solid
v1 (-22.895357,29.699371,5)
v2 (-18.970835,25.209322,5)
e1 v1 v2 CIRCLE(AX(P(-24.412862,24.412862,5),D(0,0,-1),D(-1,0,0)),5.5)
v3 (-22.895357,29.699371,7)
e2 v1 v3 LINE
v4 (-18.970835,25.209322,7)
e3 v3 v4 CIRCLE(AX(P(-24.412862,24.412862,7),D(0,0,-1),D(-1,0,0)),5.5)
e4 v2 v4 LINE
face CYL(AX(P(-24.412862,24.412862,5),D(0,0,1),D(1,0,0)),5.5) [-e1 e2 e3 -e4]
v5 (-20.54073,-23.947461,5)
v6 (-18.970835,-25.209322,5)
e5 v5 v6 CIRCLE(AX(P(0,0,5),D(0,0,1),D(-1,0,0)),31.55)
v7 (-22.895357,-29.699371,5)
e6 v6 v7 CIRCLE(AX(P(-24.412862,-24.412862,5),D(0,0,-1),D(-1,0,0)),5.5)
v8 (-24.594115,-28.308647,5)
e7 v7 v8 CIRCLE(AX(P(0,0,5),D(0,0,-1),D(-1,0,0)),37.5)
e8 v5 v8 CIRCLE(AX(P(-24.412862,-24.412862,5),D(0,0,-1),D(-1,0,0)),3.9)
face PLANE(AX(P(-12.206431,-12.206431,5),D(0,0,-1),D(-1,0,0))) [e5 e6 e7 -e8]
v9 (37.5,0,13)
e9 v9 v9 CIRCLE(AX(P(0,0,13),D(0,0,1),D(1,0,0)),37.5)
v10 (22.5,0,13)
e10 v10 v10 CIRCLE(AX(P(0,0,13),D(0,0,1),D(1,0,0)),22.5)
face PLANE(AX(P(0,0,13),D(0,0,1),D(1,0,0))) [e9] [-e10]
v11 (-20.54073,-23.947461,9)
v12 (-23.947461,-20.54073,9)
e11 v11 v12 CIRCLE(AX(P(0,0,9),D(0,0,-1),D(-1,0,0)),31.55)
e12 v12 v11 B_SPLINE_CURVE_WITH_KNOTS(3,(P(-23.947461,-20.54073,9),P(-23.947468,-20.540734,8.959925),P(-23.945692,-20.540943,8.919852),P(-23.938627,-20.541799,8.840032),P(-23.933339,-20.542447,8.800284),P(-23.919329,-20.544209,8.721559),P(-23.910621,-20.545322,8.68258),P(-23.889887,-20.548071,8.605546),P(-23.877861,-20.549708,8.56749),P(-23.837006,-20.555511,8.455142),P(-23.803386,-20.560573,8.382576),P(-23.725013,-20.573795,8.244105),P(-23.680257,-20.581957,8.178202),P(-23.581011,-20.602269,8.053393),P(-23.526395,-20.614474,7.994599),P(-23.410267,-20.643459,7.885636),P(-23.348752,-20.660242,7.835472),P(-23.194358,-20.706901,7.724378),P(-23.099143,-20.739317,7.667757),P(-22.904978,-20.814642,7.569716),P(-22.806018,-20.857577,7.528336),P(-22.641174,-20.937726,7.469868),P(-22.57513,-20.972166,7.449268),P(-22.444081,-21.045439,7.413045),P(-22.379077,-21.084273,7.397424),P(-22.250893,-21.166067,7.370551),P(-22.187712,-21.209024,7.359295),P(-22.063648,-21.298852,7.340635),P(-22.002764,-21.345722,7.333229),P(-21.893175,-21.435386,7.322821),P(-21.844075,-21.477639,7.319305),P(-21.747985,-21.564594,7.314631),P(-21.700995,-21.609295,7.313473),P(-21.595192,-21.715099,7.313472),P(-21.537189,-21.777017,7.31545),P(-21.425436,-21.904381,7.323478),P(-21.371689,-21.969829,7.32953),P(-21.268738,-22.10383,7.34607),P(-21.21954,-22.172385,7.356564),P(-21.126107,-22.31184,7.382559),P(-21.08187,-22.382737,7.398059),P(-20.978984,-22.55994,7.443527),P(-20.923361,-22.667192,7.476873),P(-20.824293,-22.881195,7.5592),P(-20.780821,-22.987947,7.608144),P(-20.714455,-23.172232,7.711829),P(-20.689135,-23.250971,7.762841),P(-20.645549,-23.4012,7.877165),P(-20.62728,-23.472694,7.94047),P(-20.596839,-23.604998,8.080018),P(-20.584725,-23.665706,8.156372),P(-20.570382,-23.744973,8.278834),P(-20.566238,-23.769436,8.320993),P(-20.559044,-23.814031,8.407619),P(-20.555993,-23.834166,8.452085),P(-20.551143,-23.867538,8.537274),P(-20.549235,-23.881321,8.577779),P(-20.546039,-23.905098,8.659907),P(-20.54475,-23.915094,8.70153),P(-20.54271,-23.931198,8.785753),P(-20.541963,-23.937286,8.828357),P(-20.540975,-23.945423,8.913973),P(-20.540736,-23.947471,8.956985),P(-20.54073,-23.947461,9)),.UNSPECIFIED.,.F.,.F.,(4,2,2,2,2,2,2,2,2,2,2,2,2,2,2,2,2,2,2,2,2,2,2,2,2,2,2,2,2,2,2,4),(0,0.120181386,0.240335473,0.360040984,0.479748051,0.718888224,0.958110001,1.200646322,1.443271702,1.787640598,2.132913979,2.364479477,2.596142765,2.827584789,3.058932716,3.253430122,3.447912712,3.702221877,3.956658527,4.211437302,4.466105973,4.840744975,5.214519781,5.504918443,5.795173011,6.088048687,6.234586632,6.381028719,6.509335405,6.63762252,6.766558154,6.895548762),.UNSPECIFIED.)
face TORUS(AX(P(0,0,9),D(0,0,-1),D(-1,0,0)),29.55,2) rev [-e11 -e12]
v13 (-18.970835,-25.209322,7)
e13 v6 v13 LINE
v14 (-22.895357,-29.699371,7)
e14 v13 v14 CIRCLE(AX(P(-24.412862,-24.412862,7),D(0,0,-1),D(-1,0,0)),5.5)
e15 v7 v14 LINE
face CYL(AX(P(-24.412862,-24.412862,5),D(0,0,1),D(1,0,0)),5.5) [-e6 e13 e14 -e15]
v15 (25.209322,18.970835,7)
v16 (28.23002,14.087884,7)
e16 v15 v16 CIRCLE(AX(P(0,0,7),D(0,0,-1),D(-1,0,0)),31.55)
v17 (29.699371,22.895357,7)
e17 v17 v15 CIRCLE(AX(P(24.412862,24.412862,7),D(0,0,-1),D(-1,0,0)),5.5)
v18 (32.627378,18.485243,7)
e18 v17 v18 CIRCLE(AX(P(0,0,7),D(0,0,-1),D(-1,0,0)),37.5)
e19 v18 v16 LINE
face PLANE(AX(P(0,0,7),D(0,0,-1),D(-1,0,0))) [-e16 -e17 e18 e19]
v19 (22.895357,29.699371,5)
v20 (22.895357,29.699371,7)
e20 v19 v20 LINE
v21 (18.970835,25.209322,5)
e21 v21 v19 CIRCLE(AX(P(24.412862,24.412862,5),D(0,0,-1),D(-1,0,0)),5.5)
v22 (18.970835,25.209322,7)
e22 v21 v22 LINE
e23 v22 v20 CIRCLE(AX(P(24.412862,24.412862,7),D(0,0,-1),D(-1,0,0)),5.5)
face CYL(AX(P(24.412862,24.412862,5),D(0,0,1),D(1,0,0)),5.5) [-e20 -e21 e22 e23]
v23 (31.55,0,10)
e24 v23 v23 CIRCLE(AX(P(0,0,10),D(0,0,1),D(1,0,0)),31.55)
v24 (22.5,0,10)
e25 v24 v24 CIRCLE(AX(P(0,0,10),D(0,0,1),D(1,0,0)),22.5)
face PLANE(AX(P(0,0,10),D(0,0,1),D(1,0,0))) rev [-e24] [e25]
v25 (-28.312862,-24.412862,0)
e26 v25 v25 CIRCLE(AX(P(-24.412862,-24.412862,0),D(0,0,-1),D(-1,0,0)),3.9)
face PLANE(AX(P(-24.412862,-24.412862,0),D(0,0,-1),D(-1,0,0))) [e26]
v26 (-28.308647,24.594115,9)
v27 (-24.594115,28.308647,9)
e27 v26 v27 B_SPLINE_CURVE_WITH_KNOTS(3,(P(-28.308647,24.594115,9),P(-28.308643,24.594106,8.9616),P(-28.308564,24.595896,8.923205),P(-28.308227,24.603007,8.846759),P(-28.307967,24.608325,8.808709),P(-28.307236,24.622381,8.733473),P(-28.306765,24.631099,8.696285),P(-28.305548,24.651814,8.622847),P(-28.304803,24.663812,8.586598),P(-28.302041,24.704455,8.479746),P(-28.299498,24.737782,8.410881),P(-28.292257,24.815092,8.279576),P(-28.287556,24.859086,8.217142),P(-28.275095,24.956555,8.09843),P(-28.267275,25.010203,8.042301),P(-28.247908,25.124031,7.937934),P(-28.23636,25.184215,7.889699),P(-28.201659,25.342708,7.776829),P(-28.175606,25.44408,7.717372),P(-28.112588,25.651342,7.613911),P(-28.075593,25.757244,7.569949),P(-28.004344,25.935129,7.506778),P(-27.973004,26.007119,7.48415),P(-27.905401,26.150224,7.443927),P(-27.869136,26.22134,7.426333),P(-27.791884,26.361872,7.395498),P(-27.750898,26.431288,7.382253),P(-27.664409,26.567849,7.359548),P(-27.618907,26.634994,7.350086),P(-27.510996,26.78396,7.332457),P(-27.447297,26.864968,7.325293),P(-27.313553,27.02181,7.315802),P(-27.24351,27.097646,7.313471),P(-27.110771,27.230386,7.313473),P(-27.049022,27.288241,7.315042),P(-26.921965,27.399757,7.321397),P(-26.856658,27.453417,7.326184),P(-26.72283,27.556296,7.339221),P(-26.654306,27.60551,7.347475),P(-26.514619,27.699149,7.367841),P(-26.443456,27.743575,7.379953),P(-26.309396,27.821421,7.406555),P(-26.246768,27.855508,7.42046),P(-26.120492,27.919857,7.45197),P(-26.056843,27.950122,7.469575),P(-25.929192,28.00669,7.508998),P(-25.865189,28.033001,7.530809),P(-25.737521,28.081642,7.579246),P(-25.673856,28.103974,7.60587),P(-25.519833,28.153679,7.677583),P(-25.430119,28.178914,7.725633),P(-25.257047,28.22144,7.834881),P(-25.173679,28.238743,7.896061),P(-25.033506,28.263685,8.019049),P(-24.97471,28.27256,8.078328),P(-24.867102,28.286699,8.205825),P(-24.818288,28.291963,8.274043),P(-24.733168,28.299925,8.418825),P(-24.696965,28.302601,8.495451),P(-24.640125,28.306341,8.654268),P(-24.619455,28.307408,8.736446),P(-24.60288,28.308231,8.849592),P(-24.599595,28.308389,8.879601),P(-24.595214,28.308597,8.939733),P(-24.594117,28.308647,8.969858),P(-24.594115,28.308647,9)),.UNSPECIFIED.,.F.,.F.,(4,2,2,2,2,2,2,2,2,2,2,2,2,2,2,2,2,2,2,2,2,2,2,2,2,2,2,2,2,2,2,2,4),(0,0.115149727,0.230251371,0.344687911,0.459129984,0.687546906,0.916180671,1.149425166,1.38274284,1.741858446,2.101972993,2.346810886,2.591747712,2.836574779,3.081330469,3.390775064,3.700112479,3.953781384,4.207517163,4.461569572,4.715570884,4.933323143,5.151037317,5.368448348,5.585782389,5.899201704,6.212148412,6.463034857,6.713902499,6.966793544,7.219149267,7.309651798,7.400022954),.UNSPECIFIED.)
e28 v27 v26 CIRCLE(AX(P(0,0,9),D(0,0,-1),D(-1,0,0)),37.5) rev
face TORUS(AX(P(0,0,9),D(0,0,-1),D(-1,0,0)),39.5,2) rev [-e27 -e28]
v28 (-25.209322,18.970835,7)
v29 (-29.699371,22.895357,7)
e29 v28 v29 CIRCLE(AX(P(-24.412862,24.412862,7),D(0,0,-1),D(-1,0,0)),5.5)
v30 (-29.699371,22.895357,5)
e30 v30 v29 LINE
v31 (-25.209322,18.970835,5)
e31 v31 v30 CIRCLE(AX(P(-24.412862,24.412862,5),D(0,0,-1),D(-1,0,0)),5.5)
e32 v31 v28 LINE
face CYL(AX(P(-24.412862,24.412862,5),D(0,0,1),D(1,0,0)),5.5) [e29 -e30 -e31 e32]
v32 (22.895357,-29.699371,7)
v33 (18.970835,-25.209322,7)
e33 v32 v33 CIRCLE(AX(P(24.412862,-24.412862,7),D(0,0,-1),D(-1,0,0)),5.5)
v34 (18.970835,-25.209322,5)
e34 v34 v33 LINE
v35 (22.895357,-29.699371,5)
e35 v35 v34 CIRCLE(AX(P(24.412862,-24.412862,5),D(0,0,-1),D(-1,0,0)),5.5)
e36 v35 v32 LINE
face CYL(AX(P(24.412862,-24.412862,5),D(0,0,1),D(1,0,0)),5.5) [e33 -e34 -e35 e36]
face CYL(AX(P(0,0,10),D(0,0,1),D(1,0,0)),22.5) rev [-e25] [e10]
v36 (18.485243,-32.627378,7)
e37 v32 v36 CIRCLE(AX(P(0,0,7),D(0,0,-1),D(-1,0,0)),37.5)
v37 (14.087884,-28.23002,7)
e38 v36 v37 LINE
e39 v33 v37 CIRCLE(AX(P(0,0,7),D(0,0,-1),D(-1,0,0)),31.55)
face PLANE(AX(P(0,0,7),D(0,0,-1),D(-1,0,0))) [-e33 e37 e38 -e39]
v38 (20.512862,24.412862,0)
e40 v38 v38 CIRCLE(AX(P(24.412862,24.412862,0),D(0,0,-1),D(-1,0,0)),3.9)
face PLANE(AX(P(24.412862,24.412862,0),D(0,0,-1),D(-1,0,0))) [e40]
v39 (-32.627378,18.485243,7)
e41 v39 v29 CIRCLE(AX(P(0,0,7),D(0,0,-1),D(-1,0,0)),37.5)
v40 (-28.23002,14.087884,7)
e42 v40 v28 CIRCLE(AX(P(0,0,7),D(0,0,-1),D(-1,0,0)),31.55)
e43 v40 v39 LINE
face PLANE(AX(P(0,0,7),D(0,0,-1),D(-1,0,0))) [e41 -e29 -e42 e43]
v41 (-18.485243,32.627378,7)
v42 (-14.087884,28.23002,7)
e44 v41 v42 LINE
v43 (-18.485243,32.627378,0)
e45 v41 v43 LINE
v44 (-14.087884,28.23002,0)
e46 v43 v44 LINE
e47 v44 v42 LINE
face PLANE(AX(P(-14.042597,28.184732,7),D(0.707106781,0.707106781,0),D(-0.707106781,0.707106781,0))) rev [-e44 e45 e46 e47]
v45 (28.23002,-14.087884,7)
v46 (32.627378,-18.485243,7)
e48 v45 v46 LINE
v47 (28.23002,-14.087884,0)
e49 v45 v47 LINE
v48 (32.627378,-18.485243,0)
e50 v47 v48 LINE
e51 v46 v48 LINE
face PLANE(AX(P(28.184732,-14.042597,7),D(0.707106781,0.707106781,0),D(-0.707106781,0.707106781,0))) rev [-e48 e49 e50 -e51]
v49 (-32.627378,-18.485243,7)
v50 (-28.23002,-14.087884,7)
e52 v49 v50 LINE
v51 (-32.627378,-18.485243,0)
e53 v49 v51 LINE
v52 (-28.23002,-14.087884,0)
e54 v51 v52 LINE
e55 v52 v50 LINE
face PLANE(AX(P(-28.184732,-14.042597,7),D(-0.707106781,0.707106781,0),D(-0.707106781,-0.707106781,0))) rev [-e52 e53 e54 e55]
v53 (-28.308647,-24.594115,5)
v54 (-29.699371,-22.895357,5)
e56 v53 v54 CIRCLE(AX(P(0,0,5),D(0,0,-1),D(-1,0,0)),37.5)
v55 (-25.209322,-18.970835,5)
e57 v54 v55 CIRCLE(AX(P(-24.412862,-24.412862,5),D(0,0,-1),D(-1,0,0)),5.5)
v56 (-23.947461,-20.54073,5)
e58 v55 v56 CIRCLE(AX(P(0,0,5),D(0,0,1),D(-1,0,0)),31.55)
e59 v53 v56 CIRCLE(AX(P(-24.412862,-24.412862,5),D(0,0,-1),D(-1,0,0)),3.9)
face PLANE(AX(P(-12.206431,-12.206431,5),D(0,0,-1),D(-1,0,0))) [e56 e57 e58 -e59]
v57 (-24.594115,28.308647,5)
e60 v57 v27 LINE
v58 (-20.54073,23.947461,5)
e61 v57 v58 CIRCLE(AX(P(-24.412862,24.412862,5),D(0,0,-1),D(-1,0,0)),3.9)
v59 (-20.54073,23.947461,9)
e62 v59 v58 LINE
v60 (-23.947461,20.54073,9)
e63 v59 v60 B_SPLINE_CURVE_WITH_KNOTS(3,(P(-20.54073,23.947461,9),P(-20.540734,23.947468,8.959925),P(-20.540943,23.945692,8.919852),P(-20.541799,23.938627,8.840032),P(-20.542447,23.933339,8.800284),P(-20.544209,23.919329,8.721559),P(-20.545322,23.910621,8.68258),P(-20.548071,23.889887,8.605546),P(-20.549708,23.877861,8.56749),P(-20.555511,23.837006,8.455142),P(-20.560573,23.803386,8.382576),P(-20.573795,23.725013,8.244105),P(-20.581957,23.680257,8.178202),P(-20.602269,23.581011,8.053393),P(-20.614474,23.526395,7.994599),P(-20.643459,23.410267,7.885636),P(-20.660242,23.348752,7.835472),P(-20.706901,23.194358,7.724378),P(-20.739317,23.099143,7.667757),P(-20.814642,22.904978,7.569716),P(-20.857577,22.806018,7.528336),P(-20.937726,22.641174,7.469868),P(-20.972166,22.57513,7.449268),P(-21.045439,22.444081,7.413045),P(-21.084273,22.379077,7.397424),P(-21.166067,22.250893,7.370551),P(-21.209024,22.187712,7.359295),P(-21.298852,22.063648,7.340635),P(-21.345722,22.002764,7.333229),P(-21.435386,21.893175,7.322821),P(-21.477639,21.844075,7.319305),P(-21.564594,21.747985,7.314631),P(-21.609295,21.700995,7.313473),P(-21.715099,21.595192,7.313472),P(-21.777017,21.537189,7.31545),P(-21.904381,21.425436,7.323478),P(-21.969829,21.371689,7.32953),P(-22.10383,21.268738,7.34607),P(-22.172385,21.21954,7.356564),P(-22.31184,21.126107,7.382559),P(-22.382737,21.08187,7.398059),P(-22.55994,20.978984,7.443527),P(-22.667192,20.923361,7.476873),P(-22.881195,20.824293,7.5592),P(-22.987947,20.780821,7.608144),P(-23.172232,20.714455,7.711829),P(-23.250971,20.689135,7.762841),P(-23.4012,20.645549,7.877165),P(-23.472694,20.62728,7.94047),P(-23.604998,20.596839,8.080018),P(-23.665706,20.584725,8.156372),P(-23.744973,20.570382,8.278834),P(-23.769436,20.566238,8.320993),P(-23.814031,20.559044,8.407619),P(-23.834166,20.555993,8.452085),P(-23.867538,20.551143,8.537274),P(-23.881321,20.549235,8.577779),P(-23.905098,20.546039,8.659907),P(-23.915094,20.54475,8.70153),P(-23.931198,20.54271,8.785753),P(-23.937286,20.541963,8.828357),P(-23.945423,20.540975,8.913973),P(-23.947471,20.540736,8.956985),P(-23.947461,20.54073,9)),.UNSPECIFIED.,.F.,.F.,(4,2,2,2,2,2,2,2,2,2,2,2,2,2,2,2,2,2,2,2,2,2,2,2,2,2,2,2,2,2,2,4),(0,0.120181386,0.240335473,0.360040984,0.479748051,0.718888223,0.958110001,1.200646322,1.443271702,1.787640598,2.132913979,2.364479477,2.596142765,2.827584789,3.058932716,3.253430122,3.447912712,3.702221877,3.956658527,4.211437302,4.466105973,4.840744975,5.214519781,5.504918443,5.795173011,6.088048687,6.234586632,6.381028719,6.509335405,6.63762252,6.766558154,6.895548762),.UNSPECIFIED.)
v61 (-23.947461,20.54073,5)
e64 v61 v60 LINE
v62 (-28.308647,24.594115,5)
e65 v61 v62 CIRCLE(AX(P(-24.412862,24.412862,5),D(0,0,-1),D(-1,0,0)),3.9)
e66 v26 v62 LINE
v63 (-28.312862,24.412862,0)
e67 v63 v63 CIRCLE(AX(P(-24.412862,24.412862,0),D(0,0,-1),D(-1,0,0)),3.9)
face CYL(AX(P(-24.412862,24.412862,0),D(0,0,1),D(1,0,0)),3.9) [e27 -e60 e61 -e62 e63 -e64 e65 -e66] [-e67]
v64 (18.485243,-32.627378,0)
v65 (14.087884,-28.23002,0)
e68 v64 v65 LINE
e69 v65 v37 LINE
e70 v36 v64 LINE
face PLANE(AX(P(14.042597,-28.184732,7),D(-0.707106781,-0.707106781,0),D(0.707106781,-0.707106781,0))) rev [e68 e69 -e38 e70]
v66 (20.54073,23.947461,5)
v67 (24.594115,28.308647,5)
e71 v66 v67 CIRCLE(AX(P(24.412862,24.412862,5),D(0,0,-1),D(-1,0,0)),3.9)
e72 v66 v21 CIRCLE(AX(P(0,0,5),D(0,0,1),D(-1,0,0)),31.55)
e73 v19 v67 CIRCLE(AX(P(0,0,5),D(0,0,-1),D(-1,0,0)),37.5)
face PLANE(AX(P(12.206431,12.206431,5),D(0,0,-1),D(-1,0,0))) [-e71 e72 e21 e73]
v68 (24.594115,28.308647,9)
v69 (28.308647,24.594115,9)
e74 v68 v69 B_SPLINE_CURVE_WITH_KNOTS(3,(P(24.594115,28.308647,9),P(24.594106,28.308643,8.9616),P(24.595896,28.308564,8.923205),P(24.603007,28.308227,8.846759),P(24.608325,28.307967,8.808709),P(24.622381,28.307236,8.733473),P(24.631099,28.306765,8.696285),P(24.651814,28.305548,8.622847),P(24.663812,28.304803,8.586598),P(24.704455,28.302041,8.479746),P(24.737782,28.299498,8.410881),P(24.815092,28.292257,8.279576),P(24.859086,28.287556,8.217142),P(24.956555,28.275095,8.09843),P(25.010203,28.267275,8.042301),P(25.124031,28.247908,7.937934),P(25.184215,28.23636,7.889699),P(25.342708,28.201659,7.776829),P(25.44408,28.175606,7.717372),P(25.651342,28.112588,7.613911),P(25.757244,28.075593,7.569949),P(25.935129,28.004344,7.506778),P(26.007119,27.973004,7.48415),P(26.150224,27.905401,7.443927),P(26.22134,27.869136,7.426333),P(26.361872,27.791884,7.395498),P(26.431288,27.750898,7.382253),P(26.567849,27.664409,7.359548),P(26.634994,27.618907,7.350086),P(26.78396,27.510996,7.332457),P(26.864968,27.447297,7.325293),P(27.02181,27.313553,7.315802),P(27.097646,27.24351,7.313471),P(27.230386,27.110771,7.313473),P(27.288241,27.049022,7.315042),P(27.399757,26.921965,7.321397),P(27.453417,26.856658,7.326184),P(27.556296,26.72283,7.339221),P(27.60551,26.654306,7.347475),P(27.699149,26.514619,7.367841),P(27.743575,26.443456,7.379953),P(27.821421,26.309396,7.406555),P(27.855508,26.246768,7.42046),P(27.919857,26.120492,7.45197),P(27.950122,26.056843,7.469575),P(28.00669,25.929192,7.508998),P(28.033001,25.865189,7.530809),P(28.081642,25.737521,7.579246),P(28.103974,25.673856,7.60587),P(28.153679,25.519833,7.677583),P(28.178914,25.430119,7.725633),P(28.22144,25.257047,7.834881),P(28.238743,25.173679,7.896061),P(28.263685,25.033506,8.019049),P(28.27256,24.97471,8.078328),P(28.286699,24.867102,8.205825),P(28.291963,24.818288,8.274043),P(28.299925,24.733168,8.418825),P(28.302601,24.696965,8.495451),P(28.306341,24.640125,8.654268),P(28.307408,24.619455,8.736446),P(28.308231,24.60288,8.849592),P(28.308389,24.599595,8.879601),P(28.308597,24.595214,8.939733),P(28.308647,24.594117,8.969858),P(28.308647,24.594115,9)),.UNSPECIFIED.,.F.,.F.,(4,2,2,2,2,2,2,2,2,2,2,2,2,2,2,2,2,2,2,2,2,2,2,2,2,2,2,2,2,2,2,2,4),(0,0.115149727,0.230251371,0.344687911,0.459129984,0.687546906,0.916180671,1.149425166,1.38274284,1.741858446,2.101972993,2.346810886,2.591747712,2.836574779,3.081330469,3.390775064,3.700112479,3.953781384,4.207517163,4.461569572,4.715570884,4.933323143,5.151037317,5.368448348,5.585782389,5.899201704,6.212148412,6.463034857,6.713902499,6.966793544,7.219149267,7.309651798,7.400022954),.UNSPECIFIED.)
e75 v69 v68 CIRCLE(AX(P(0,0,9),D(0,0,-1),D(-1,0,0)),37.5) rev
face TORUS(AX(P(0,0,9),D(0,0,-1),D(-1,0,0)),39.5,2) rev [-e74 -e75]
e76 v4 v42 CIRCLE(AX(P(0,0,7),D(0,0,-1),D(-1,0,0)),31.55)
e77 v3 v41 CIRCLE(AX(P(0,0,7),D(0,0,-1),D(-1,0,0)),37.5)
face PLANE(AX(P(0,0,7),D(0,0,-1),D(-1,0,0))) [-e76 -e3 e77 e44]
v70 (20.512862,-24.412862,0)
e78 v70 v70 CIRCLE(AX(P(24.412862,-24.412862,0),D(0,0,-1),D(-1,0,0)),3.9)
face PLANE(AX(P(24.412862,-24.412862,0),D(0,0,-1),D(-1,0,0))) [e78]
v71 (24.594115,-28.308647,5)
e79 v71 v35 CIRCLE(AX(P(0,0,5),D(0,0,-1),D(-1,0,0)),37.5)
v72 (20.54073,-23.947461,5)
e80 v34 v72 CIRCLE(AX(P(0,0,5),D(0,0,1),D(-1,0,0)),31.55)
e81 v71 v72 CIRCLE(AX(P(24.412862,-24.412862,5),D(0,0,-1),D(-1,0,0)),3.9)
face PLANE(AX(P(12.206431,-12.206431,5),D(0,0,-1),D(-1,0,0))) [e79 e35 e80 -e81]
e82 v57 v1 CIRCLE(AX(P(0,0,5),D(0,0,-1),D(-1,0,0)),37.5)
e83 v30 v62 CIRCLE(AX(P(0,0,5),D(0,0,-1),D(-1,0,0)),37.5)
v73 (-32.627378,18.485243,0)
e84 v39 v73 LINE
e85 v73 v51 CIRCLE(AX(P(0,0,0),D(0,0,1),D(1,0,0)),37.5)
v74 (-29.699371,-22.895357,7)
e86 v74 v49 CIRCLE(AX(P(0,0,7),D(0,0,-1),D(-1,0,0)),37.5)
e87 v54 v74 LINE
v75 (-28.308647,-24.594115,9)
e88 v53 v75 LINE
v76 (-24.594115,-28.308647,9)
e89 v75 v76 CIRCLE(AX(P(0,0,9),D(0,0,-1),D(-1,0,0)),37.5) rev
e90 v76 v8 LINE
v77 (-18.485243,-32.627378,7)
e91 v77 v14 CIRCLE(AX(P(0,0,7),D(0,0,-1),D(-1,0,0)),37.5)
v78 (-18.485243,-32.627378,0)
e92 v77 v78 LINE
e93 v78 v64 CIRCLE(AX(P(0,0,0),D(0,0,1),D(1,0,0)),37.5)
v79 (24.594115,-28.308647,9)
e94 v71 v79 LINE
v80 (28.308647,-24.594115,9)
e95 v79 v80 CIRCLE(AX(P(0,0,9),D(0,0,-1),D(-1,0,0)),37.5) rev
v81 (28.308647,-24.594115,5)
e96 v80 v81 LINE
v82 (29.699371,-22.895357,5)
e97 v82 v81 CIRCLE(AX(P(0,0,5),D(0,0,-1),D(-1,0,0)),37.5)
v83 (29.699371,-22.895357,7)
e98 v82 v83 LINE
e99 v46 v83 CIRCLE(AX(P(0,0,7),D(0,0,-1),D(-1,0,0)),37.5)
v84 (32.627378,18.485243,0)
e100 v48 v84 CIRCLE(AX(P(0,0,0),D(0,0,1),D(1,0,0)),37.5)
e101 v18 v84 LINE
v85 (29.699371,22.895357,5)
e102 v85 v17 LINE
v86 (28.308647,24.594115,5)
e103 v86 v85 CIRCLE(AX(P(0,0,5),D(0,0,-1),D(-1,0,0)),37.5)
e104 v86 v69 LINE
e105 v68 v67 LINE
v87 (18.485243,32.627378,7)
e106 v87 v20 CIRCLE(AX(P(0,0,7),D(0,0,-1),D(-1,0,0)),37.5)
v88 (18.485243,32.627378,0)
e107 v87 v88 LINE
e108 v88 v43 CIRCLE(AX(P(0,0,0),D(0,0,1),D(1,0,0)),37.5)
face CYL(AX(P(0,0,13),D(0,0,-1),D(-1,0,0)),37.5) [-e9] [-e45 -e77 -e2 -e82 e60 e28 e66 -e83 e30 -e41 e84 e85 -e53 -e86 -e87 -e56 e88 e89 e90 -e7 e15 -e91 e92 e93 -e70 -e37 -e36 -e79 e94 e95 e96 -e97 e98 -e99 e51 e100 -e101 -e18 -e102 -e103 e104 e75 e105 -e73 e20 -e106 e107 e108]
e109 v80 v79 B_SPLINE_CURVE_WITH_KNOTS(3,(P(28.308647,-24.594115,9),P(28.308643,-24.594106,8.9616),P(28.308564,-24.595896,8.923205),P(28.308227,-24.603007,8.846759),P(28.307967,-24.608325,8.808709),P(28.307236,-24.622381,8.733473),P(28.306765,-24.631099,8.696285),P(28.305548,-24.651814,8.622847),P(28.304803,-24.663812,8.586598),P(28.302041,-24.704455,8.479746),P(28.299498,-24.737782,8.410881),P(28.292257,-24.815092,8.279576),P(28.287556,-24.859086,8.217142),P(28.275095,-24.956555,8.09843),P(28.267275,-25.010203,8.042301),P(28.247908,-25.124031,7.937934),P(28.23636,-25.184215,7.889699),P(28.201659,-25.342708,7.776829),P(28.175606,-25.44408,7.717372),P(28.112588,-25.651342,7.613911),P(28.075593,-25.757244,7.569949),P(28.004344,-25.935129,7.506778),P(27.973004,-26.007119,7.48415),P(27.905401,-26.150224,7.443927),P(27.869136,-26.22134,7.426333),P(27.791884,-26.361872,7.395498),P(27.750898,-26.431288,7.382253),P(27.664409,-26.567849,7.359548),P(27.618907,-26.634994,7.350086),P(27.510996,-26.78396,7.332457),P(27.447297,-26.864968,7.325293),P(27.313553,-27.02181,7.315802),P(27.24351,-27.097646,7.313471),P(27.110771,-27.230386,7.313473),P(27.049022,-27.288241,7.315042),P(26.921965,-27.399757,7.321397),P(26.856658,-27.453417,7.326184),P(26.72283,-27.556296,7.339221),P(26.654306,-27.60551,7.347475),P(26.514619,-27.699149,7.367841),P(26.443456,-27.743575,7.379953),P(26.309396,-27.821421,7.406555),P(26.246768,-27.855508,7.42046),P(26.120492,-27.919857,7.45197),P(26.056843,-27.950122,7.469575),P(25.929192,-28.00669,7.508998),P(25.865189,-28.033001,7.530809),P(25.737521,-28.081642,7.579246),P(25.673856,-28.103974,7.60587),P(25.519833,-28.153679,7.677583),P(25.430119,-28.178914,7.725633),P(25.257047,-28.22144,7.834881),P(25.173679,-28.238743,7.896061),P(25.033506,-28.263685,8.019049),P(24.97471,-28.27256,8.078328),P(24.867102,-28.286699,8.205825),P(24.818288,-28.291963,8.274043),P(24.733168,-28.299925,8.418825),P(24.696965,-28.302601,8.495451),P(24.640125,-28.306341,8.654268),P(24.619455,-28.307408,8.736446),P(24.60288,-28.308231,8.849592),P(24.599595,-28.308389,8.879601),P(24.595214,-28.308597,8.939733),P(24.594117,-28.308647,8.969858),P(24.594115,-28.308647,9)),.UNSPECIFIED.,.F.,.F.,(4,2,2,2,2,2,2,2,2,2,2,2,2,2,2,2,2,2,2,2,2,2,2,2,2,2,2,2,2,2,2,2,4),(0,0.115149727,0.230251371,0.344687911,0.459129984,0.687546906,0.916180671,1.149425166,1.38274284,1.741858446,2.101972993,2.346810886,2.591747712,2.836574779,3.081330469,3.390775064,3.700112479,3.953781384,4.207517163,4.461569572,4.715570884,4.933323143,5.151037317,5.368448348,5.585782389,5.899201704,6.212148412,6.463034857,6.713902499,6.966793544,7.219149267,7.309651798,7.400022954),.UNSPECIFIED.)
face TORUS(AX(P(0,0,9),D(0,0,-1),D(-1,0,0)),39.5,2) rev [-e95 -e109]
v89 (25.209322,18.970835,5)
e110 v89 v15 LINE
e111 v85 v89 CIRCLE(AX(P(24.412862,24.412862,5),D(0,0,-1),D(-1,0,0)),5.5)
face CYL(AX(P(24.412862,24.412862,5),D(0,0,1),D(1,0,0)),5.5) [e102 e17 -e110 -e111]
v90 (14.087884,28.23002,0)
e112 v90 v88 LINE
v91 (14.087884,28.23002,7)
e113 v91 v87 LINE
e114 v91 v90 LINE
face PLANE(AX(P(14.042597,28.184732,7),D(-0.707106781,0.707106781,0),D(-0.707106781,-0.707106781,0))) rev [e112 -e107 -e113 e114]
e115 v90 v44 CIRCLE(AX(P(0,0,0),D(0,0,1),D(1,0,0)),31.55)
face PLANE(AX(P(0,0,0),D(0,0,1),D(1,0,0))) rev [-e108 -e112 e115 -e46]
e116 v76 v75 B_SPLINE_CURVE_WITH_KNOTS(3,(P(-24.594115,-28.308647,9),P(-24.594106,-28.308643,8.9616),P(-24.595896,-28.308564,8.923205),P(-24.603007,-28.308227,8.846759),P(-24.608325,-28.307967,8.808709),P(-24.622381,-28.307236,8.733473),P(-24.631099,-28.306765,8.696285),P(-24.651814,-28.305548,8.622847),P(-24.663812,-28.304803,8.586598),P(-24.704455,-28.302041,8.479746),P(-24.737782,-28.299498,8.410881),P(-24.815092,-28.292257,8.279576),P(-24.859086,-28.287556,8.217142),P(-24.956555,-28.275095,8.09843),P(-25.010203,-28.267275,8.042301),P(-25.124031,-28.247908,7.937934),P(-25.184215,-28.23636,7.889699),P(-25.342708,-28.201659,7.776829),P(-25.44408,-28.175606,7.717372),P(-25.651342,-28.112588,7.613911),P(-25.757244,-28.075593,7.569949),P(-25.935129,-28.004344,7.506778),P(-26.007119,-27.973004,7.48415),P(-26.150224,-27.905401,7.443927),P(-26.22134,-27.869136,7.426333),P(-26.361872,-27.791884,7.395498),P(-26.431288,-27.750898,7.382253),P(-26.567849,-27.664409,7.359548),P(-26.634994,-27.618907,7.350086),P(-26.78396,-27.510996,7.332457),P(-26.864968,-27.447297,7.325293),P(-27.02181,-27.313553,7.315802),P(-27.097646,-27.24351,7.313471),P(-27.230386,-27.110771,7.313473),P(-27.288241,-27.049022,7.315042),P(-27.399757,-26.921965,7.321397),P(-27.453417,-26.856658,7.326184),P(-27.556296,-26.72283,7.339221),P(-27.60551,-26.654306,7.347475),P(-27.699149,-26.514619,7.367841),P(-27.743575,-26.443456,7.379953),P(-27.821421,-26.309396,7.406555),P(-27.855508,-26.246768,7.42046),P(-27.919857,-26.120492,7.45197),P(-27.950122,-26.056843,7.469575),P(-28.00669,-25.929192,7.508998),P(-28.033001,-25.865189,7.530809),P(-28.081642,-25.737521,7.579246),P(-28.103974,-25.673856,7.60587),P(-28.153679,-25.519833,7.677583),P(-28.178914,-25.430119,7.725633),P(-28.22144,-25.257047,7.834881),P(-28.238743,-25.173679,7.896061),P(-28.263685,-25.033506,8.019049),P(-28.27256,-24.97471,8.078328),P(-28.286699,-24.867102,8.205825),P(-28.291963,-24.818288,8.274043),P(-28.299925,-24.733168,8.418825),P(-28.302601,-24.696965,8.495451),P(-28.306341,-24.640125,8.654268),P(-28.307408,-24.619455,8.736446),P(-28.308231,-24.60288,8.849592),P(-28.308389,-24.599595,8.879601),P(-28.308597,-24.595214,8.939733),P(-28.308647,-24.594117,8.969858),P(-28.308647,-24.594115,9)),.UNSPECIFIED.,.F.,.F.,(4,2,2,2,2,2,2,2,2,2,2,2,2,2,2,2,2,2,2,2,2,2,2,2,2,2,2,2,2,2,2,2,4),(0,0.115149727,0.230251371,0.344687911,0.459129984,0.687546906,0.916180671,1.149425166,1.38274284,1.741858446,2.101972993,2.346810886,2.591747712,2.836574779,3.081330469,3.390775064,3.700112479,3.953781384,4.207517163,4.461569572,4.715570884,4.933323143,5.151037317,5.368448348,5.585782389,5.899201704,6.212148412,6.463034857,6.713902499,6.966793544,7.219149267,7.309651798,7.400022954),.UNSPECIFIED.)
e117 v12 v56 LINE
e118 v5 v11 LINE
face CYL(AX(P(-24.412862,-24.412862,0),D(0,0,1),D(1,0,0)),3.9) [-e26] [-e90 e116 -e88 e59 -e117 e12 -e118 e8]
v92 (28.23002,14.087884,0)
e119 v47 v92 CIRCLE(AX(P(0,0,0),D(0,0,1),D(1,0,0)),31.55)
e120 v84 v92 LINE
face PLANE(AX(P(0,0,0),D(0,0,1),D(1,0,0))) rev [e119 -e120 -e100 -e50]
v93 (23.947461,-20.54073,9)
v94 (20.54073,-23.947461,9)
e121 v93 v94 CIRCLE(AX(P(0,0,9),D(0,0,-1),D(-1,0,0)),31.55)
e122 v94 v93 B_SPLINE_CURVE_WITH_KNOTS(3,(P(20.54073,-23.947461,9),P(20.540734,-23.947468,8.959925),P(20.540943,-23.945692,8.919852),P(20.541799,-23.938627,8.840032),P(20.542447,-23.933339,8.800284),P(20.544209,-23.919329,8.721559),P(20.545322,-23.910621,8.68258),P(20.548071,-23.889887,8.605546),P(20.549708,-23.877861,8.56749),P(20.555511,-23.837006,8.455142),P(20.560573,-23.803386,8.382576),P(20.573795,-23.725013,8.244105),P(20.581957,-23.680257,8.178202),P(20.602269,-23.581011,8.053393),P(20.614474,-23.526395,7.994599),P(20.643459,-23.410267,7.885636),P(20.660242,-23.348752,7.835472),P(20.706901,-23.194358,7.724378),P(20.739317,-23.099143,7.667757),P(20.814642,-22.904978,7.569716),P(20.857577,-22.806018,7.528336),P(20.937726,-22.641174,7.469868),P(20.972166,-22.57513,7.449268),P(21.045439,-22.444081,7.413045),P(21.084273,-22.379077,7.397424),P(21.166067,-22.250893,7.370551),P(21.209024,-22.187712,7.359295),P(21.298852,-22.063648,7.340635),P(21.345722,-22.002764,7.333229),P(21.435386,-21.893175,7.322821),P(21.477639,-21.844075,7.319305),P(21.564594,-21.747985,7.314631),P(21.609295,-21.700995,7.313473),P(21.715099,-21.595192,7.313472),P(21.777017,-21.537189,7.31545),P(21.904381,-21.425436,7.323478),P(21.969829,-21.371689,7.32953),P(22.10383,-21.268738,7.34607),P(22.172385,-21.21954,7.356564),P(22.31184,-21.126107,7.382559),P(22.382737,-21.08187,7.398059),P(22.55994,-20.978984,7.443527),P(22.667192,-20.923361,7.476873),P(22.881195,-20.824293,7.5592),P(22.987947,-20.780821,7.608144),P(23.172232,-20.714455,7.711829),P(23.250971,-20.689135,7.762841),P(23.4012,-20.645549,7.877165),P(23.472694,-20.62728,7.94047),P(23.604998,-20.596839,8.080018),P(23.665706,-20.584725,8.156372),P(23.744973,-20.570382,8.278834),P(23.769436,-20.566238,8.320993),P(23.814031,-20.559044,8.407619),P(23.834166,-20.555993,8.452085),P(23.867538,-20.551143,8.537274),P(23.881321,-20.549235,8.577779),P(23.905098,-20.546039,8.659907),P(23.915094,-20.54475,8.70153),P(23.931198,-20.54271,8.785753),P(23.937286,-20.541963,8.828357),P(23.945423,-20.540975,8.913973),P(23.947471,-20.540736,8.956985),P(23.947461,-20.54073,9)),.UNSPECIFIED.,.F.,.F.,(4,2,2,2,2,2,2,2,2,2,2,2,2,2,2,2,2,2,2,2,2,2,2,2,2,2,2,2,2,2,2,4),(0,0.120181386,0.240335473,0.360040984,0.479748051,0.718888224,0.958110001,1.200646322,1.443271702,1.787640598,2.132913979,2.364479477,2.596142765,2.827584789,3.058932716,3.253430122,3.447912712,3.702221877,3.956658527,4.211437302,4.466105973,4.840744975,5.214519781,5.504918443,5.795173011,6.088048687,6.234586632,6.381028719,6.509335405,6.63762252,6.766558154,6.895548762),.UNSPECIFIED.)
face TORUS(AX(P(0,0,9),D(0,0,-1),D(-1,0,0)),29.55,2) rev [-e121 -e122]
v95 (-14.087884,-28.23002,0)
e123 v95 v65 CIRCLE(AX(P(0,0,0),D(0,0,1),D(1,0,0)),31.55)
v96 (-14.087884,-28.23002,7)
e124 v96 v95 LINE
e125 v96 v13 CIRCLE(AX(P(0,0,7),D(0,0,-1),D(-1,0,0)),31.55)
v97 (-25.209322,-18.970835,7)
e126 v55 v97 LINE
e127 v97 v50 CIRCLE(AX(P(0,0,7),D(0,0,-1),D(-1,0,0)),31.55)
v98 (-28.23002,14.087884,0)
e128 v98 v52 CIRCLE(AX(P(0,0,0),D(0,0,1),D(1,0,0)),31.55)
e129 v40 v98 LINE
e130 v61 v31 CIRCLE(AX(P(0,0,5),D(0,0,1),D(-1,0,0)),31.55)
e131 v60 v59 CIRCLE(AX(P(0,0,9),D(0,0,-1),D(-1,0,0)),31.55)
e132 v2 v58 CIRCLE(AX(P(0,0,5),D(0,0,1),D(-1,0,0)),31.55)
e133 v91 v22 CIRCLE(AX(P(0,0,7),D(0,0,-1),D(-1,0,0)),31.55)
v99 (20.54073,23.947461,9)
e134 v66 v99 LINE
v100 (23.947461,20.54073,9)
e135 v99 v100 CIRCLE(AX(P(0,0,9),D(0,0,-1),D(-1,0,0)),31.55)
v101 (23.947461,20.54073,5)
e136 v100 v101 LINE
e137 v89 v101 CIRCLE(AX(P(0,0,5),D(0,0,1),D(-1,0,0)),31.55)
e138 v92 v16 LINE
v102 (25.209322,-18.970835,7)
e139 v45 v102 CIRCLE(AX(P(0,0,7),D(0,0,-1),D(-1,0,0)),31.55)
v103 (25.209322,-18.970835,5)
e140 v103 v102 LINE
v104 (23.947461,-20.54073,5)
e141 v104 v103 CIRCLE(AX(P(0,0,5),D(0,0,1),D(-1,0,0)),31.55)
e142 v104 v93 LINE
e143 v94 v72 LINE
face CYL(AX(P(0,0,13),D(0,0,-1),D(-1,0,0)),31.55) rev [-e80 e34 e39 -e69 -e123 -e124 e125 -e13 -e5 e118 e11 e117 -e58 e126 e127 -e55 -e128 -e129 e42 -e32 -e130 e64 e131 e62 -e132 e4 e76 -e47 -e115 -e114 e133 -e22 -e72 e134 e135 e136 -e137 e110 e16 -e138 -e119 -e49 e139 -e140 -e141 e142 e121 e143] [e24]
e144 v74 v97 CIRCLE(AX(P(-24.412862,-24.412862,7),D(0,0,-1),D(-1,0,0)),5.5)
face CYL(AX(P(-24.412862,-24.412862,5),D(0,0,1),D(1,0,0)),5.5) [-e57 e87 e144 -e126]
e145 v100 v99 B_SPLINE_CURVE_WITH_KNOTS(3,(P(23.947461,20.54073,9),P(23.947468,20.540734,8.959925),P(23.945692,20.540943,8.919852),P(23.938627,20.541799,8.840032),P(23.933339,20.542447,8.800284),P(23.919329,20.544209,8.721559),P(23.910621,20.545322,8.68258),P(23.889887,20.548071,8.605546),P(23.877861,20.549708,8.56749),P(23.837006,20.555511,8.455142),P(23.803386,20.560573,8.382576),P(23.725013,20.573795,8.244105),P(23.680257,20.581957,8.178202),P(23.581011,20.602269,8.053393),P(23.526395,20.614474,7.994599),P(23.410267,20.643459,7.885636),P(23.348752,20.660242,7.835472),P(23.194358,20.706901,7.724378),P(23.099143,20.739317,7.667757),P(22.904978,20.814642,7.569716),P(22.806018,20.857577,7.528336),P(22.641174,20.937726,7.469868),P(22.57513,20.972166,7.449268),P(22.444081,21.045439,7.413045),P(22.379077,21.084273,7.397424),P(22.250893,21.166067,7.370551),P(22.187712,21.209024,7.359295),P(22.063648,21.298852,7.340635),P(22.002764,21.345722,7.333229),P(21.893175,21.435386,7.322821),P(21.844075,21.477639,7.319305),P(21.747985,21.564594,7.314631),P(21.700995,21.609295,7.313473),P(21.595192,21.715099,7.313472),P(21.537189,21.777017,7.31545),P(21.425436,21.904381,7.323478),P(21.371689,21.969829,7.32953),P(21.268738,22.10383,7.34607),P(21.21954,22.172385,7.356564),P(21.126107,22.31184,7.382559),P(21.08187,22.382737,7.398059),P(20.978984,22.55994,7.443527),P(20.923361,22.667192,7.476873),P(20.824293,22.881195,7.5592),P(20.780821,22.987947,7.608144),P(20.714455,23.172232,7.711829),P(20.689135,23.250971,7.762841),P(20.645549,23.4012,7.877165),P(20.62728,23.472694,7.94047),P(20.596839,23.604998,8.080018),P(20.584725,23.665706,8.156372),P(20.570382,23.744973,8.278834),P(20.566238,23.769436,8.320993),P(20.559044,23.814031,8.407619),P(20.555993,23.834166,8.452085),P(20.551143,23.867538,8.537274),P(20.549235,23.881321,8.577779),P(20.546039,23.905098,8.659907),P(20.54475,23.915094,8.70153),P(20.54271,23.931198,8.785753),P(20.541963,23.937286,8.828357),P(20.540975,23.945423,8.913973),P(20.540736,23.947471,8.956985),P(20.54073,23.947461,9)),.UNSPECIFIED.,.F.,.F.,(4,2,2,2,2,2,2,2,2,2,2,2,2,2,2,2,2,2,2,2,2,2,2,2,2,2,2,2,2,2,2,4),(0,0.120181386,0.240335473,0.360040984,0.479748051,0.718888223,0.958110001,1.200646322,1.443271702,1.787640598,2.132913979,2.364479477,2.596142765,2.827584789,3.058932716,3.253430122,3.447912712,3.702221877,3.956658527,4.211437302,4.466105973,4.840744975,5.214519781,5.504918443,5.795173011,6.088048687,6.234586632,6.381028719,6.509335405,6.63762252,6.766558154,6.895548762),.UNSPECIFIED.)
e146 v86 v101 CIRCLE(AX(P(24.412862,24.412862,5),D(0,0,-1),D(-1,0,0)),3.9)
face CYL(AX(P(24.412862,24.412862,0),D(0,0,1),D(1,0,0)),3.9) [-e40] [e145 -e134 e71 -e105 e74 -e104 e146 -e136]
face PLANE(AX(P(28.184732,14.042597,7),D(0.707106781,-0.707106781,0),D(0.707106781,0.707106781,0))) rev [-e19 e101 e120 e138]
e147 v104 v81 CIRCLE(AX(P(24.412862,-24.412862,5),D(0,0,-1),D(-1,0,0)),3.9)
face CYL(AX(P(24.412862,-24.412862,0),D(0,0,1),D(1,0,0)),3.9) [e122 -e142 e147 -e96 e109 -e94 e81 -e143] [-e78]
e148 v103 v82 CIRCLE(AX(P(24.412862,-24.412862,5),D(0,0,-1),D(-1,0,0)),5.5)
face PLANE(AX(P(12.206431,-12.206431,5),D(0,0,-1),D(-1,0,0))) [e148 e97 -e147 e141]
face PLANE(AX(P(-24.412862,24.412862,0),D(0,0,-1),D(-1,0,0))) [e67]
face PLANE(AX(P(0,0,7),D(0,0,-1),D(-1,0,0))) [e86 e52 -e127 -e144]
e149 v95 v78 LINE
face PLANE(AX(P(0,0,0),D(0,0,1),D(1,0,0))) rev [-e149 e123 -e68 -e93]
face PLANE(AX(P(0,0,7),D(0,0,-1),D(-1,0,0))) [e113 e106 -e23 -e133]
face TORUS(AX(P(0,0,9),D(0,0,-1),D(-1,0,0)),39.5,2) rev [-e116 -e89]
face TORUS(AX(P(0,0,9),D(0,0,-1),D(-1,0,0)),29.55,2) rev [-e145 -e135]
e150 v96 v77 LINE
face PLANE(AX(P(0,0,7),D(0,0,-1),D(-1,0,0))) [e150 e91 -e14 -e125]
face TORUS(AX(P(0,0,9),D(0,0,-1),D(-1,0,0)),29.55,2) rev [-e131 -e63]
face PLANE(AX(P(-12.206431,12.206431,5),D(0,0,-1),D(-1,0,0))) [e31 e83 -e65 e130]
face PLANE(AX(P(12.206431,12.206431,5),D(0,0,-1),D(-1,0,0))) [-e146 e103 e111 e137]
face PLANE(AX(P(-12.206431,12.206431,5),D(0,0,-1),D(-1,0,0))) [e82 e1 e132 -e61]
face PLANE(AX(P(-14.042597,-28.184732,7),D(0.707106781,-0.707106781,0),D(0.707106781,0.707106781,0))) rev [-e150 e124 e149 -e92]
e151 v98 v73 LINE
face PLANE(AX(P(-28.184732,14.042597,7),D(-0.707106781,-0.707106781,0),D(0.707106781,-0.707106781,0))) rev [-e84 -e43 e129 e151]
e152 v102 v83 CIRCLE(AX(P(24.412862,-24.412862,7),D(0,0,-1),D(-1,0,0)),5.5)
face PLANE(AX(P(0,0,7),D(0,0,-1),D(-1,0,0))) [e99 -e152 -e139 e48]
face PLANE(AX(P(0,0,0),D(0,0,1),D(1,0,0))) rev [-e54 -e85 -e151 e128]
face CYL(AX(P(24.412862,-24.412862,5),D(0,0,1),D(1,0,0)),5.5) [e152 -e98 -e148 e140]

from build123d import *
from build123d.topology import SkipClean

# Parameters (mm, degrees)
SKETCH1_R           = 37.5
SKETCH1_R_2         = 31.55
BOSS_EXTRUDE3_DEPTH = 13
BOSS_EXTRUDE4_START = -3
SKETCH3_R           = 31.55
SKETCH3_R_2         = 22.5
BOSS_EXTRUDE4_DEPTH = 3
CUT_EXTRUDE1_DEPTH  = 7
SKETCH5_R           = 3.9
BOSS_EXTRUDE5_DEPTH = 7
FILLET1_R           = 2
BOSS_EXTRUDE6_START = 2
BOSS_EXTRUDE6_DEPTH = 2


with BuildPart() as part:
    # Sketch1 → Boss-Extrude3 (new body)
    with BuildSketch(Plane.XY):
        with Locations(Location((0, 0, 0), (0, 0, 180))):
            Circle(SKETCH1_R)
        with Locations(Location((0, 0, 0), (0, 0, 180))):
            Circle(SKETCH1_R_2, mode=Mode.SUBTRACT)
    extrude(amount=BOSS_EXTRUDE3_DEPTH)

    # Sketch3 → Boss-Extrude4 (add)
    with BuildSketch(Plane.XY.offset(13).offset(BOSS_EXTRUDE4_START)):
        with Locations(Location((0, 0, 0), (0, 0, 180))):
            Circle(SKETCH3_R)
        Circle(SKETCH3_R_2, mode=Mode.SUBTRACT)
    extrude(amount=BOSS_EXTRUDE4_DEPTH)

    # Sketch4 → Cut-Extrude1 (cut)
    with BuildSketch(Plane(origin=(0, 0, 0), x_dir=(-1, 0, 0), z_dir=(0, 0, -1))):
        with BuildLine():
            Line((14.042596771, 28.184732394), (18.485242563, 32.627378187))
            ThreePointArc((18.485242563, 32.627378187), (26.516504294, 26.516504294), (32.627378187, 18.485242563))
            Line((32.627378187, 18.485242563), (28.184732394, 14.042596771))
            ThreePointArc((28.184732394, 14.042596771), (22.266271176, 22.266271176), (14.042596771, 28.184732394))
        make_face()
        with BuildLine():
            Line((-28.184732394, 14.042596771), (-32.627378187, 18.485242563))
            ThreePointArc((-32.627378187, 18.485242563), (-26.516504294, 26.516504294), (-18.485242563, 32.627378187))
            Line((-18.485242563, 32.627378187), (-14.042596771, 28.184732394))
            ThreePointArc((-14.042596771, 28.184732394), (-22.266271176, 22.266271176), (-28.184732394, 14.042596771))
        make_face()
        with BuildLine():
            Line((28.184732394, -14.042596771), (32.627378187, -18.485242563))
            ThreePointArc((32.627378187, -18.485242563), (26.516504294, -26.516504294), (18.485242563, -32.627378187))
            Line((18.485242563, -32.627378187), (14.042596771, -28.184732394))
            ThreePointArc((14.042596771, -28.184732394), (22.266271176, -22.266271176), (28.184732394, -14.042596771))
        make_face()
        with BuildLine():
            Line((-14.042596771, -28.184732394), (-18.485242563, -32.627378187))
            ThreePointArc((-18.485242563, -32.627378187), (-26.516504294, -26.516504294), (-32.627378187, -18.485242563))
            Line((-32.627378187, -18.485242563), (-28.184732394, -14.042596771))
            ThreePointArc((-28.184732394, -14.042596771), (-22.266271176, -22.266271176), (-14.042596771, -28.184732394))
        make_face()
    extrude(amount=-CUT_EXTRUDE1_DEPTH, mode=Mode.SUBTRACT)

    # Sketch5 → Boss-Extrude5 (add)
    with BuildSketch(Plane(origin=(0, 0, 7), x_dir=(-1, 0, 0), z_dir=(0, 0, -1))):
        with Locations(Location((-24.41286162, 24.41286162, 0), (0, 0, 177.336210289))):
            Circle(SKETCH5_R)
        with Locations(Location((24.41286162, 24.41286162, 0), (0, 0, 186.853632151))):
            Circle(SKETCH5_R)
        with Locations(Location((24.41286162, -24.41286162, 0), (0, 0, 173.146367849))):
            Circle(SKETCH5_R)
        with Locations(Location((-24.41286162, -24.41286162, 0), (0, 0, 182.663789711))):
            Circle(SKETCH5_R)
    extrude(amount=BOSS_EXTRUDE5_DEPTH)

    # Fillet1
    # the kernel refuses this fillet: 2 mm, written as the material it adds along each edge
    with BuildSketch(Plane(origin=(0, 0, 7), x_dir=(0.8522672417072393, -0.5231066322584089, 0), z_dir=(0.5231066322584089, 0.8522672417072393, 0))) as fillet1_piece_1_section:
        with BuildLine():
            CenterArc((31.55 - FILLET1_R, -FILLET1_R), FILLET1_R, 0, 90)
            Line((31.55 - FILLET1_R, 0), (31.55 - FILLET1_R, FILLET1_R * 0.02))
            Line((31.55 - FILLET1_R, FILLET1_R * 0.02), (31.55 + FILLET1_R * 0.02, FILLET1_R * 0.02))
            Line((31.55 + FILLET1_R * 0.02, FILLET1_R * 0.02), (31.55 + FILLET1_R * 0.02, -FILLET1_R))
            Line((31.55 + FILLET1_R * 0.02, -FILLET1_R), (31.55, -FILLET1_R))
        make_face()
    fillet1_piece_1 = revolve(axis=Axis((0, 0, 7), (0, 0, -1)), revolution_arc=26.918260189, mode=Mode.PRIVATE)
    fillet1_piece_1 = split(fillet1_piece_1, bisect_by=Plane(origin=(22.123120479, -22.123120561, 7), z_dir=(0, 0, 1)), keep=Keep.TOP, mode=Mode.PRIVATE)
    fillet1_piece_1 = fillet1_piece_1 & Plane(origin=(24.41286162, -24.41286162, 7.600786832), x_dir=(0.9989194462244536, -0.046475154164681974, 0), z_dir=(0, 0, 1)) * Cylinder(3.9, 127, mode=Mode.PRIVATE)
    add(fillet1_piece_1)
    with BuildSketch(Plane(origin=(0, 0, 7), x_dir=(-0.5231066322587135, -0.8522672417070523, 0), z_dir=(0.8522672417070523, -0.5231066322587135, 0))) as fillet1_piece_2_section:
        with BuildLine():
            CenterArc((31.55 - FILLET1_R, -FILLET1_R), FILLET1_R, 0, 90)
            Line((31.55 - FILLET1_R, 0), (31.55 - FILLET1_R, FILLET1_R * 0.02))
            Line((31.55 - FILLET1_R, FILLET1_R * 0.02), (31.55 + FILLET1_R * 0.02, FILLET1_R * 0.02))
            Line((31.55 + FILLET1_R * 0.02, FILLET1_R * 0.02), (31.55 + FILLET1_R * 0.02, -FILLET1_R))
            Line((31.55 + FILLET1_R * 0.02, -FILLET1_R), (31.55, -FILLET1_R))
        make_face()
    fillet1_piece_2 = revolve(axis=Axis((0, 0, 7), (0, 0, -1)), revolution_arc=26.918260189, mode=Mode.PRIVATE)
    fillet1_piece_2 = split(fillet1_piece_2, bisect_by=Plane(origin=(-22.123120549, -22.123120494, 7), z_dir=(0, 0, 1)), keep=Keep.TOP, mode=Mode.PRIVATE)
    fillet1_piece_2 = fillet1_piece_2 & Plane(origin=(-24.41286162, -24.41286162, 7.600786841), x_dir=(0.9928542401658877, 0.11933338922790077, 0), z_dir=(0, 0, 1)) * Cylinder(3.9, 127, mode=Mode.PRIVATE)
    add(fillet1_piece_2)
    with BuildSketch(Plane(origin=(0, 0, 7), x_dir=(-0.852267241707228, 0.5231066322584271, 0), z_dir=(-0.5231066322584271, -0.852267241707228, 0))) as fillet1_piece_3_section:
        with BuildLine():
            CenterArc((31.55 - FILLET1_R, -FILLET1_R), FILLET1_R, 0, 90)
            Line((31.55 - FILLET1_R, 0), (31.55 - FILLET1_R, FILLET1_R * 0.02))
            Line((31.55 - FILLET1_R, FILLET1_R * 0.02), (31.55 + FILLET1_R * 0.02, FILLET1_R * 0.02))
            Line((31.55 + FILLET1_R * 0.02, FILLET1_R * 0.02), (31.55 + FILLET1_R * 0.02, -FILLET1_R))
            Line((31.55 + FILLET1_R * 0.02, -FILLET1_R), (31.55, -FILLET1_R))
        make_face()
    fillet1_piece_3 = revolve(axis=Axis((0, 0, 7), (0, 0, -1)), revolution_arc=26.918260189, mode=Mode.PRIVATE)
    fillet1_piece_3 = split(fillet1_piece_3, bisect_by=Plane(origin=(-22.12312056, 22.123120602, 7), z_dir=(0, 0, 1)), keep=Keep.TOP, mode=Mode.PRIVATE)
    fillet1_piece_3 = fillet1_piece_3 & Plane(origin=(-24.41286162, 24.41286162, 7.600787298), x_dir=(0.9928542401658879, -0.11933338922790053, 0), z_dir=(0, 0, 1)) * Cylinder(3.9, 127, mode=Mode.PRIVATE)
    add(fillet1_piece_3)
    with BuildSketch(Plane(origin=(0, 0, 7), x_dir=(0.5231066322584331, 0.8522672417072245, 0), z_dir=(-0.8522672417072245, 0.5231066322584331, 0))) as fillet1_piece_4_section:
        with BuildLine():
            CenterArc((31.55 - FILLET1_R, -FILLET1_R), FILLET1_R, 0, 90)
            Line((31.55 - FILLET1_R, 0), (31.55 - FILLET1_R, FILLET1_R * 0.02))
            Line((31.55 - FILLET1_R, FILLET1_R * 0.02), (31.55 + FILLET1_R * 0.02, FILLET1_R * 0.02))
            Line((31.55 + FILLET1_R * 0.02, FILLET1_R * 0.02), (31.55 + FILLET1_R * 0.02, -FILLET1_R))
            Line((31.55 + FILLET1_R * 0.02, -FILLET1_R), (31.55, -FILLET1_R))
        make_face()
    fillet1_piece_4 = revolve(axis=Axis((0, 0, 7), (0, 0, -1)), revolution_arc=26.918260189, mode=Mode.PRIVATE)
    fillet1_piece_4 = split(fillet1_piece_4, bisect_by=Plane(origin=(22.123120561, 22.123120479, 7), z_dir=(0, 0, 1)), keep=Keep.TOP, mode=Mode.PRIVATE)
    fillet1_piece_4 = fillet1_piece_4 & Plane(origin=(24.41286162, 24.41286162, 7.600786832), x_dir=(0.9989194462244536, 0.04647515416468177, 0), z_dir=(0, 0, 1)) * Cylinder(3.9, 127, mode=Mode.PRIVATE)
    add(fillet1_piece_4)
    with BuildSketch(Plane(origin=(0, 0, 7), x_dir=(-0.5496666156121164, 0.8353841102639683, 0), z_dir=(0.8353841102639683, 0.5496666156121164, 0))) as fillet1_piece_5_section:
        with BuildLine():
            CenterArc((37.5 + FILLET1_R, FILLET1_R), FILLET1_R, 180, 90)
            Line((37.5 + FILLET1_R, 0), (37.5 + FILLET1_R, -FILLET1_R * 0.02))
            Line((37.5 + FILLET1_R, -FILLET1_R * 0.02), (37.5 - FILLET1_R * 0.02, -FILLET1_R * 0.02))
            Line((37.5 - FILLET1_R * 0.02, -FILLET1_R * 0.02), (37.5 - FILLET1_R * 0.02, FILLET1_R))
            Line((37.5 - FILLET1_R * 0.02, FILLET1_R), (37.5, FILLET1_R))
        make_face()
    fillet1_piece_5 = revolve(axis=Axis((0, 0, 7), (0, 0, 1)), revolution_arc=23.311711171, mode=Mode.PRIVATE)
    fillet1_piece_5 = split(fillet1_piece_5, bisect_by=Plane(origin=(-26.670763505, 26.670763698, 7), z_dir=(0, 0, 1)), keep=Keep.TOP, mode=Mode.PRIVATE)
    fillet1_piece_5 = fillet1_piece_5 & Plane(origin=(-24.41286162, 24.41286162, 7.599310908), x_dir=(0.9928542401658879, -0.11933338922790053, 0), z_dir=(0, 0, 1)) * Cylinder(3.9, 159, mode=Mode.PRIVATE)
    add(fillet1_piece_5)
    with BuildSketch(Plane(origin=(0, 0, 7), x_dir=(-0.83538411026401, -0.5496666156120531, 0), z_dir=(-0.5496666156120531, 0.83538411026401, 0))) as fillet1_piece_6_section:
        with BuildLine():
            CenterArc((37.5 + FILLET1_R, FILLET1_R), FILLET1_R, 180, 90)
            Line((37.5 + FILLET1_R, 0), (37.5 + FILLET1_R, -FILLET1_R * 0.02))
            Line((37.5 + FILLET1_R, -FILLET1_R * 0.02), (37.5 - FILLET1_R * 0.02, -FILLET1_R * 0.02))
            Line((37.5 - FILLET1_R * 0.02, -FILLET1_R * 0.02), (37.5 - FILLET1_R * 0.02, FILLET1_R))
            Line((37.5 - FILLET1_R * 0.02, FILLET1_R), (37.5, FILLET1_R))
        make_face()
    fillet1_piece_6 = revolve(axis=Axis((0, 0, 7), (0, 0, 1)), revolution_arc=23.311711171, mode=Mode.PRIVATE)
    fillet1_piece_6 = split(fillet1_piece_6, bisect_by=Plane(origin=(-26.670763698, -26.670763505, 7), z_dir=(0, 0, 1)), keep=Keep.TOP, mode=Mode.PRIVATE)
    fillet1_piece_6 = fillet1_piece_6 & Plane(origin=(-24.41286162, -24.41286162, 7.599310908), x_dir=(0.9928542401658877, 0.11933338922790077, 0), z_dir=(0, 0, 1)) * Cylinder(3.9, 159, mode=Mode.PRIVATE)
    add(fillet1_piece_6)
    with BuildSketch(Plane(origin=(0, 0, 7), x_dir=(0.5496666156120977, -0.8353841102639804, 0), z_dir=(-0.8353841102639804, -0.5496666156120977, 0))) as fillet1_piece_7_section:
        with BuildLine():
            CenterArc((37.5 + FILLET1_R, FILLET1_R), FILLET1_R, 180, 90)
            Line((37.5 + FILLET1_R, 0), (37.5 + FILLET1_R, -FILLET1_R * 0.02))
            Line((37.5 + FILLET1_R, -FILLET1_R * 0.02), (37.5 - FILLET1_R * 0.02, -FILLET1_R * 0.02))
            Line((37.5 - FILLET1_R * 0.02, -FILLET1_R * 0.02), (37.5 - FILLET1_R * 0.02, FILLET1_R))
            Line((37.5 - FILLET1_R * 0.02, FILLET1_R), (37.5, FILLET1_R))
        make_face()
    fillet1_piece_7 = revolve(axis=Axis((0, 0, 7), (0, 0, 1)), revolution_arc=23.311711171, mode=Mode.PRIVATE)
    fillet1_piece_7 = split(fillet1_piece_7, bisect_by=Plane(origin=(26.670763696, -26.670763753, 7), z_dir=(0, 0, 1)), keep=Keep.TOP, mode=Mode.PRIVATE)
    fillet1_piece_7 = fillet1_piece_7 & Plane(origin=(24.41286162, -24.41286162, 7.599310071), x_dir=(0.9989194462244536, -0.046475154164681974, 0), z_dir=(0, 0, 1)) * Cylinder(3.9, 159, mode=Mode.PRIVATE)
    add(fillet1_piece_7)
    with BuildSketch(Plane(origin=(0, 0, 7), x_dir=(0.8353841102637132, 0.549666615612504, 0), z_dir=(0.549666615612504, -0.8353841102637132, 0))) as fillet1_piece_8_section:
        with BuildLine():
            CenterArc((37.5 + FILLET1_R, FILLET1_R), FILLET1_R, 180, 90)
            Line((37.5 + FILLET1_R, 0), (37.5 + FILLET1_R, -FILLET1_R * 0.02))
            Line((37.5 + FILLET1_R, -FILLET1_R * 0.02), (37.5 - FILLET1_R * 0.02, -FILLET1_R * 0.02))
            Line((37.5 - FILLET1_R * 0.02, -FILLET1_R * 0.02), (37.5 - FILLET1_R * 0.02, FILLET1_R))
            Line((37.5 - FILLET1_R * 0.02, FILLET1_R), (37.5, FILLET1_R))
        make_face()
    fillet1_piece_8 = revolve(axis=Axis((0, 0, 7), (0, 0, 1)), revolution_arc=23.311711171, mode=Mode.PRIVATE)
    fillet1_piece_8 = split(fillet1_piece_8, bisect_by=Plane(origin=(26.670763736, 26.670763453, 7), z_dir=(0, 0, 1)), keep=Keep.TOP, mode=Mode.PRIVATE)
    fillet1_piece_8 = fillet1_piece_8 & Plane(origin=(24.41286162, 24.41286162, 7.599310915), x_dir=(0.9989194462244536, 0.04647515416468177, 0), z_dir=(0, 0, 1)) * Cylinder(3.9, 159, mode=Mode.PRIVATE)
    add(fillet1_piece_8)

    # Sketch6 → Boss-Extrude6 (add)
    with SkipClean():  # the faces are left unmerged after this step: merging them gives an invalid solid
        with BuildSketch(Plane(origin=(0, 0, 7), x_dir=(-1, 0, 0), z_dir=(0, 0, -1)).offset(BOSS_EXTRUDE6_START)):
            with BuildLine():
                ThreePointArc((-18.970835248, 25.209321887), (-20.271738243, 28.0324054), (-22.895356993, 29.699370838))
                ThreePointArc((-22.895356993, 29.699370838), (-26.516504294, 26.516504294), (-29.699370838, 22.895356993))
                ThreePointArc((-29.699370838, 22.895356993), (-28.0324054, 20.271738243), (-25.209321887, 18.970835248))
                ThreePointArc((-25.209321887, 18.970835248), (-22.309218946, 22.309218946), (-18.970835248, 25.209321887))
            make_face()
            with BuildLine():
                ThreePointArc((25.209321887, 18.970835248), (28.0324054, 20.271738243), (29.699370838, 22.895356993))
                ThreePointArc((29.699370838, 22.895356993), (26.516504294, 26.516504294), (22.895356993, 29.699370838))
                ThreePointArc((22.895356993, 29.699370838), (20.271738243, 28.0324054), (18.970835248, 25.209321887))
                ThreePointArc((18.970835248, 25.209321887), (22.309218946, 22.309218946), (25.209321887, 18.970835248))
            make_face()
            with BuildLine():
                ThreePointArc((18.970835248, -25.209321887), (20.271738243, -28.0324054), (22.895356993, -29.699370838))
                ThreePointArc((22.895356993, -29.699370838), (26.516504294, -26.516504294), (29.699370838, -22.895356993))
                ThreePointArc((29.699370838, -22.895356993), (28.0324054, -20.271738243), (25.209321887, -18.970835248))
                ThreePointArc((25.209321887, -18.970835248), (22.309218946, -22.309218946), (18.970835248, -25.209321887))
            make_face()
            with BuildLine():
                ThreePointArc((-25.209321887, -18.970835248), (-28.0324054, -20.271738243), (-29.699370838, -22.895356993))
                ThreePointArc((-29.699370838, -22.895356993), (-26.516504294, -26.516504294), (-22.895356993, -29.699370838))
                ThreePointArc((-22.895356993, -29.699370838), (-20.271738243, -28.0324054), (-18.970835248, -25.209321887))
                ThreePointArc((-18.970835248, -25.209321887), (-22.309218946, -22.309218946), (-25.209321887, -18.970835248))
            make_face()
        extrude(amount=-BOSS_EXTRUDE6_DEPTH)
    add(part.part.scale(1), mode=Mode.REPLACE)  # the faces are merged on a copy


solid = part.part
